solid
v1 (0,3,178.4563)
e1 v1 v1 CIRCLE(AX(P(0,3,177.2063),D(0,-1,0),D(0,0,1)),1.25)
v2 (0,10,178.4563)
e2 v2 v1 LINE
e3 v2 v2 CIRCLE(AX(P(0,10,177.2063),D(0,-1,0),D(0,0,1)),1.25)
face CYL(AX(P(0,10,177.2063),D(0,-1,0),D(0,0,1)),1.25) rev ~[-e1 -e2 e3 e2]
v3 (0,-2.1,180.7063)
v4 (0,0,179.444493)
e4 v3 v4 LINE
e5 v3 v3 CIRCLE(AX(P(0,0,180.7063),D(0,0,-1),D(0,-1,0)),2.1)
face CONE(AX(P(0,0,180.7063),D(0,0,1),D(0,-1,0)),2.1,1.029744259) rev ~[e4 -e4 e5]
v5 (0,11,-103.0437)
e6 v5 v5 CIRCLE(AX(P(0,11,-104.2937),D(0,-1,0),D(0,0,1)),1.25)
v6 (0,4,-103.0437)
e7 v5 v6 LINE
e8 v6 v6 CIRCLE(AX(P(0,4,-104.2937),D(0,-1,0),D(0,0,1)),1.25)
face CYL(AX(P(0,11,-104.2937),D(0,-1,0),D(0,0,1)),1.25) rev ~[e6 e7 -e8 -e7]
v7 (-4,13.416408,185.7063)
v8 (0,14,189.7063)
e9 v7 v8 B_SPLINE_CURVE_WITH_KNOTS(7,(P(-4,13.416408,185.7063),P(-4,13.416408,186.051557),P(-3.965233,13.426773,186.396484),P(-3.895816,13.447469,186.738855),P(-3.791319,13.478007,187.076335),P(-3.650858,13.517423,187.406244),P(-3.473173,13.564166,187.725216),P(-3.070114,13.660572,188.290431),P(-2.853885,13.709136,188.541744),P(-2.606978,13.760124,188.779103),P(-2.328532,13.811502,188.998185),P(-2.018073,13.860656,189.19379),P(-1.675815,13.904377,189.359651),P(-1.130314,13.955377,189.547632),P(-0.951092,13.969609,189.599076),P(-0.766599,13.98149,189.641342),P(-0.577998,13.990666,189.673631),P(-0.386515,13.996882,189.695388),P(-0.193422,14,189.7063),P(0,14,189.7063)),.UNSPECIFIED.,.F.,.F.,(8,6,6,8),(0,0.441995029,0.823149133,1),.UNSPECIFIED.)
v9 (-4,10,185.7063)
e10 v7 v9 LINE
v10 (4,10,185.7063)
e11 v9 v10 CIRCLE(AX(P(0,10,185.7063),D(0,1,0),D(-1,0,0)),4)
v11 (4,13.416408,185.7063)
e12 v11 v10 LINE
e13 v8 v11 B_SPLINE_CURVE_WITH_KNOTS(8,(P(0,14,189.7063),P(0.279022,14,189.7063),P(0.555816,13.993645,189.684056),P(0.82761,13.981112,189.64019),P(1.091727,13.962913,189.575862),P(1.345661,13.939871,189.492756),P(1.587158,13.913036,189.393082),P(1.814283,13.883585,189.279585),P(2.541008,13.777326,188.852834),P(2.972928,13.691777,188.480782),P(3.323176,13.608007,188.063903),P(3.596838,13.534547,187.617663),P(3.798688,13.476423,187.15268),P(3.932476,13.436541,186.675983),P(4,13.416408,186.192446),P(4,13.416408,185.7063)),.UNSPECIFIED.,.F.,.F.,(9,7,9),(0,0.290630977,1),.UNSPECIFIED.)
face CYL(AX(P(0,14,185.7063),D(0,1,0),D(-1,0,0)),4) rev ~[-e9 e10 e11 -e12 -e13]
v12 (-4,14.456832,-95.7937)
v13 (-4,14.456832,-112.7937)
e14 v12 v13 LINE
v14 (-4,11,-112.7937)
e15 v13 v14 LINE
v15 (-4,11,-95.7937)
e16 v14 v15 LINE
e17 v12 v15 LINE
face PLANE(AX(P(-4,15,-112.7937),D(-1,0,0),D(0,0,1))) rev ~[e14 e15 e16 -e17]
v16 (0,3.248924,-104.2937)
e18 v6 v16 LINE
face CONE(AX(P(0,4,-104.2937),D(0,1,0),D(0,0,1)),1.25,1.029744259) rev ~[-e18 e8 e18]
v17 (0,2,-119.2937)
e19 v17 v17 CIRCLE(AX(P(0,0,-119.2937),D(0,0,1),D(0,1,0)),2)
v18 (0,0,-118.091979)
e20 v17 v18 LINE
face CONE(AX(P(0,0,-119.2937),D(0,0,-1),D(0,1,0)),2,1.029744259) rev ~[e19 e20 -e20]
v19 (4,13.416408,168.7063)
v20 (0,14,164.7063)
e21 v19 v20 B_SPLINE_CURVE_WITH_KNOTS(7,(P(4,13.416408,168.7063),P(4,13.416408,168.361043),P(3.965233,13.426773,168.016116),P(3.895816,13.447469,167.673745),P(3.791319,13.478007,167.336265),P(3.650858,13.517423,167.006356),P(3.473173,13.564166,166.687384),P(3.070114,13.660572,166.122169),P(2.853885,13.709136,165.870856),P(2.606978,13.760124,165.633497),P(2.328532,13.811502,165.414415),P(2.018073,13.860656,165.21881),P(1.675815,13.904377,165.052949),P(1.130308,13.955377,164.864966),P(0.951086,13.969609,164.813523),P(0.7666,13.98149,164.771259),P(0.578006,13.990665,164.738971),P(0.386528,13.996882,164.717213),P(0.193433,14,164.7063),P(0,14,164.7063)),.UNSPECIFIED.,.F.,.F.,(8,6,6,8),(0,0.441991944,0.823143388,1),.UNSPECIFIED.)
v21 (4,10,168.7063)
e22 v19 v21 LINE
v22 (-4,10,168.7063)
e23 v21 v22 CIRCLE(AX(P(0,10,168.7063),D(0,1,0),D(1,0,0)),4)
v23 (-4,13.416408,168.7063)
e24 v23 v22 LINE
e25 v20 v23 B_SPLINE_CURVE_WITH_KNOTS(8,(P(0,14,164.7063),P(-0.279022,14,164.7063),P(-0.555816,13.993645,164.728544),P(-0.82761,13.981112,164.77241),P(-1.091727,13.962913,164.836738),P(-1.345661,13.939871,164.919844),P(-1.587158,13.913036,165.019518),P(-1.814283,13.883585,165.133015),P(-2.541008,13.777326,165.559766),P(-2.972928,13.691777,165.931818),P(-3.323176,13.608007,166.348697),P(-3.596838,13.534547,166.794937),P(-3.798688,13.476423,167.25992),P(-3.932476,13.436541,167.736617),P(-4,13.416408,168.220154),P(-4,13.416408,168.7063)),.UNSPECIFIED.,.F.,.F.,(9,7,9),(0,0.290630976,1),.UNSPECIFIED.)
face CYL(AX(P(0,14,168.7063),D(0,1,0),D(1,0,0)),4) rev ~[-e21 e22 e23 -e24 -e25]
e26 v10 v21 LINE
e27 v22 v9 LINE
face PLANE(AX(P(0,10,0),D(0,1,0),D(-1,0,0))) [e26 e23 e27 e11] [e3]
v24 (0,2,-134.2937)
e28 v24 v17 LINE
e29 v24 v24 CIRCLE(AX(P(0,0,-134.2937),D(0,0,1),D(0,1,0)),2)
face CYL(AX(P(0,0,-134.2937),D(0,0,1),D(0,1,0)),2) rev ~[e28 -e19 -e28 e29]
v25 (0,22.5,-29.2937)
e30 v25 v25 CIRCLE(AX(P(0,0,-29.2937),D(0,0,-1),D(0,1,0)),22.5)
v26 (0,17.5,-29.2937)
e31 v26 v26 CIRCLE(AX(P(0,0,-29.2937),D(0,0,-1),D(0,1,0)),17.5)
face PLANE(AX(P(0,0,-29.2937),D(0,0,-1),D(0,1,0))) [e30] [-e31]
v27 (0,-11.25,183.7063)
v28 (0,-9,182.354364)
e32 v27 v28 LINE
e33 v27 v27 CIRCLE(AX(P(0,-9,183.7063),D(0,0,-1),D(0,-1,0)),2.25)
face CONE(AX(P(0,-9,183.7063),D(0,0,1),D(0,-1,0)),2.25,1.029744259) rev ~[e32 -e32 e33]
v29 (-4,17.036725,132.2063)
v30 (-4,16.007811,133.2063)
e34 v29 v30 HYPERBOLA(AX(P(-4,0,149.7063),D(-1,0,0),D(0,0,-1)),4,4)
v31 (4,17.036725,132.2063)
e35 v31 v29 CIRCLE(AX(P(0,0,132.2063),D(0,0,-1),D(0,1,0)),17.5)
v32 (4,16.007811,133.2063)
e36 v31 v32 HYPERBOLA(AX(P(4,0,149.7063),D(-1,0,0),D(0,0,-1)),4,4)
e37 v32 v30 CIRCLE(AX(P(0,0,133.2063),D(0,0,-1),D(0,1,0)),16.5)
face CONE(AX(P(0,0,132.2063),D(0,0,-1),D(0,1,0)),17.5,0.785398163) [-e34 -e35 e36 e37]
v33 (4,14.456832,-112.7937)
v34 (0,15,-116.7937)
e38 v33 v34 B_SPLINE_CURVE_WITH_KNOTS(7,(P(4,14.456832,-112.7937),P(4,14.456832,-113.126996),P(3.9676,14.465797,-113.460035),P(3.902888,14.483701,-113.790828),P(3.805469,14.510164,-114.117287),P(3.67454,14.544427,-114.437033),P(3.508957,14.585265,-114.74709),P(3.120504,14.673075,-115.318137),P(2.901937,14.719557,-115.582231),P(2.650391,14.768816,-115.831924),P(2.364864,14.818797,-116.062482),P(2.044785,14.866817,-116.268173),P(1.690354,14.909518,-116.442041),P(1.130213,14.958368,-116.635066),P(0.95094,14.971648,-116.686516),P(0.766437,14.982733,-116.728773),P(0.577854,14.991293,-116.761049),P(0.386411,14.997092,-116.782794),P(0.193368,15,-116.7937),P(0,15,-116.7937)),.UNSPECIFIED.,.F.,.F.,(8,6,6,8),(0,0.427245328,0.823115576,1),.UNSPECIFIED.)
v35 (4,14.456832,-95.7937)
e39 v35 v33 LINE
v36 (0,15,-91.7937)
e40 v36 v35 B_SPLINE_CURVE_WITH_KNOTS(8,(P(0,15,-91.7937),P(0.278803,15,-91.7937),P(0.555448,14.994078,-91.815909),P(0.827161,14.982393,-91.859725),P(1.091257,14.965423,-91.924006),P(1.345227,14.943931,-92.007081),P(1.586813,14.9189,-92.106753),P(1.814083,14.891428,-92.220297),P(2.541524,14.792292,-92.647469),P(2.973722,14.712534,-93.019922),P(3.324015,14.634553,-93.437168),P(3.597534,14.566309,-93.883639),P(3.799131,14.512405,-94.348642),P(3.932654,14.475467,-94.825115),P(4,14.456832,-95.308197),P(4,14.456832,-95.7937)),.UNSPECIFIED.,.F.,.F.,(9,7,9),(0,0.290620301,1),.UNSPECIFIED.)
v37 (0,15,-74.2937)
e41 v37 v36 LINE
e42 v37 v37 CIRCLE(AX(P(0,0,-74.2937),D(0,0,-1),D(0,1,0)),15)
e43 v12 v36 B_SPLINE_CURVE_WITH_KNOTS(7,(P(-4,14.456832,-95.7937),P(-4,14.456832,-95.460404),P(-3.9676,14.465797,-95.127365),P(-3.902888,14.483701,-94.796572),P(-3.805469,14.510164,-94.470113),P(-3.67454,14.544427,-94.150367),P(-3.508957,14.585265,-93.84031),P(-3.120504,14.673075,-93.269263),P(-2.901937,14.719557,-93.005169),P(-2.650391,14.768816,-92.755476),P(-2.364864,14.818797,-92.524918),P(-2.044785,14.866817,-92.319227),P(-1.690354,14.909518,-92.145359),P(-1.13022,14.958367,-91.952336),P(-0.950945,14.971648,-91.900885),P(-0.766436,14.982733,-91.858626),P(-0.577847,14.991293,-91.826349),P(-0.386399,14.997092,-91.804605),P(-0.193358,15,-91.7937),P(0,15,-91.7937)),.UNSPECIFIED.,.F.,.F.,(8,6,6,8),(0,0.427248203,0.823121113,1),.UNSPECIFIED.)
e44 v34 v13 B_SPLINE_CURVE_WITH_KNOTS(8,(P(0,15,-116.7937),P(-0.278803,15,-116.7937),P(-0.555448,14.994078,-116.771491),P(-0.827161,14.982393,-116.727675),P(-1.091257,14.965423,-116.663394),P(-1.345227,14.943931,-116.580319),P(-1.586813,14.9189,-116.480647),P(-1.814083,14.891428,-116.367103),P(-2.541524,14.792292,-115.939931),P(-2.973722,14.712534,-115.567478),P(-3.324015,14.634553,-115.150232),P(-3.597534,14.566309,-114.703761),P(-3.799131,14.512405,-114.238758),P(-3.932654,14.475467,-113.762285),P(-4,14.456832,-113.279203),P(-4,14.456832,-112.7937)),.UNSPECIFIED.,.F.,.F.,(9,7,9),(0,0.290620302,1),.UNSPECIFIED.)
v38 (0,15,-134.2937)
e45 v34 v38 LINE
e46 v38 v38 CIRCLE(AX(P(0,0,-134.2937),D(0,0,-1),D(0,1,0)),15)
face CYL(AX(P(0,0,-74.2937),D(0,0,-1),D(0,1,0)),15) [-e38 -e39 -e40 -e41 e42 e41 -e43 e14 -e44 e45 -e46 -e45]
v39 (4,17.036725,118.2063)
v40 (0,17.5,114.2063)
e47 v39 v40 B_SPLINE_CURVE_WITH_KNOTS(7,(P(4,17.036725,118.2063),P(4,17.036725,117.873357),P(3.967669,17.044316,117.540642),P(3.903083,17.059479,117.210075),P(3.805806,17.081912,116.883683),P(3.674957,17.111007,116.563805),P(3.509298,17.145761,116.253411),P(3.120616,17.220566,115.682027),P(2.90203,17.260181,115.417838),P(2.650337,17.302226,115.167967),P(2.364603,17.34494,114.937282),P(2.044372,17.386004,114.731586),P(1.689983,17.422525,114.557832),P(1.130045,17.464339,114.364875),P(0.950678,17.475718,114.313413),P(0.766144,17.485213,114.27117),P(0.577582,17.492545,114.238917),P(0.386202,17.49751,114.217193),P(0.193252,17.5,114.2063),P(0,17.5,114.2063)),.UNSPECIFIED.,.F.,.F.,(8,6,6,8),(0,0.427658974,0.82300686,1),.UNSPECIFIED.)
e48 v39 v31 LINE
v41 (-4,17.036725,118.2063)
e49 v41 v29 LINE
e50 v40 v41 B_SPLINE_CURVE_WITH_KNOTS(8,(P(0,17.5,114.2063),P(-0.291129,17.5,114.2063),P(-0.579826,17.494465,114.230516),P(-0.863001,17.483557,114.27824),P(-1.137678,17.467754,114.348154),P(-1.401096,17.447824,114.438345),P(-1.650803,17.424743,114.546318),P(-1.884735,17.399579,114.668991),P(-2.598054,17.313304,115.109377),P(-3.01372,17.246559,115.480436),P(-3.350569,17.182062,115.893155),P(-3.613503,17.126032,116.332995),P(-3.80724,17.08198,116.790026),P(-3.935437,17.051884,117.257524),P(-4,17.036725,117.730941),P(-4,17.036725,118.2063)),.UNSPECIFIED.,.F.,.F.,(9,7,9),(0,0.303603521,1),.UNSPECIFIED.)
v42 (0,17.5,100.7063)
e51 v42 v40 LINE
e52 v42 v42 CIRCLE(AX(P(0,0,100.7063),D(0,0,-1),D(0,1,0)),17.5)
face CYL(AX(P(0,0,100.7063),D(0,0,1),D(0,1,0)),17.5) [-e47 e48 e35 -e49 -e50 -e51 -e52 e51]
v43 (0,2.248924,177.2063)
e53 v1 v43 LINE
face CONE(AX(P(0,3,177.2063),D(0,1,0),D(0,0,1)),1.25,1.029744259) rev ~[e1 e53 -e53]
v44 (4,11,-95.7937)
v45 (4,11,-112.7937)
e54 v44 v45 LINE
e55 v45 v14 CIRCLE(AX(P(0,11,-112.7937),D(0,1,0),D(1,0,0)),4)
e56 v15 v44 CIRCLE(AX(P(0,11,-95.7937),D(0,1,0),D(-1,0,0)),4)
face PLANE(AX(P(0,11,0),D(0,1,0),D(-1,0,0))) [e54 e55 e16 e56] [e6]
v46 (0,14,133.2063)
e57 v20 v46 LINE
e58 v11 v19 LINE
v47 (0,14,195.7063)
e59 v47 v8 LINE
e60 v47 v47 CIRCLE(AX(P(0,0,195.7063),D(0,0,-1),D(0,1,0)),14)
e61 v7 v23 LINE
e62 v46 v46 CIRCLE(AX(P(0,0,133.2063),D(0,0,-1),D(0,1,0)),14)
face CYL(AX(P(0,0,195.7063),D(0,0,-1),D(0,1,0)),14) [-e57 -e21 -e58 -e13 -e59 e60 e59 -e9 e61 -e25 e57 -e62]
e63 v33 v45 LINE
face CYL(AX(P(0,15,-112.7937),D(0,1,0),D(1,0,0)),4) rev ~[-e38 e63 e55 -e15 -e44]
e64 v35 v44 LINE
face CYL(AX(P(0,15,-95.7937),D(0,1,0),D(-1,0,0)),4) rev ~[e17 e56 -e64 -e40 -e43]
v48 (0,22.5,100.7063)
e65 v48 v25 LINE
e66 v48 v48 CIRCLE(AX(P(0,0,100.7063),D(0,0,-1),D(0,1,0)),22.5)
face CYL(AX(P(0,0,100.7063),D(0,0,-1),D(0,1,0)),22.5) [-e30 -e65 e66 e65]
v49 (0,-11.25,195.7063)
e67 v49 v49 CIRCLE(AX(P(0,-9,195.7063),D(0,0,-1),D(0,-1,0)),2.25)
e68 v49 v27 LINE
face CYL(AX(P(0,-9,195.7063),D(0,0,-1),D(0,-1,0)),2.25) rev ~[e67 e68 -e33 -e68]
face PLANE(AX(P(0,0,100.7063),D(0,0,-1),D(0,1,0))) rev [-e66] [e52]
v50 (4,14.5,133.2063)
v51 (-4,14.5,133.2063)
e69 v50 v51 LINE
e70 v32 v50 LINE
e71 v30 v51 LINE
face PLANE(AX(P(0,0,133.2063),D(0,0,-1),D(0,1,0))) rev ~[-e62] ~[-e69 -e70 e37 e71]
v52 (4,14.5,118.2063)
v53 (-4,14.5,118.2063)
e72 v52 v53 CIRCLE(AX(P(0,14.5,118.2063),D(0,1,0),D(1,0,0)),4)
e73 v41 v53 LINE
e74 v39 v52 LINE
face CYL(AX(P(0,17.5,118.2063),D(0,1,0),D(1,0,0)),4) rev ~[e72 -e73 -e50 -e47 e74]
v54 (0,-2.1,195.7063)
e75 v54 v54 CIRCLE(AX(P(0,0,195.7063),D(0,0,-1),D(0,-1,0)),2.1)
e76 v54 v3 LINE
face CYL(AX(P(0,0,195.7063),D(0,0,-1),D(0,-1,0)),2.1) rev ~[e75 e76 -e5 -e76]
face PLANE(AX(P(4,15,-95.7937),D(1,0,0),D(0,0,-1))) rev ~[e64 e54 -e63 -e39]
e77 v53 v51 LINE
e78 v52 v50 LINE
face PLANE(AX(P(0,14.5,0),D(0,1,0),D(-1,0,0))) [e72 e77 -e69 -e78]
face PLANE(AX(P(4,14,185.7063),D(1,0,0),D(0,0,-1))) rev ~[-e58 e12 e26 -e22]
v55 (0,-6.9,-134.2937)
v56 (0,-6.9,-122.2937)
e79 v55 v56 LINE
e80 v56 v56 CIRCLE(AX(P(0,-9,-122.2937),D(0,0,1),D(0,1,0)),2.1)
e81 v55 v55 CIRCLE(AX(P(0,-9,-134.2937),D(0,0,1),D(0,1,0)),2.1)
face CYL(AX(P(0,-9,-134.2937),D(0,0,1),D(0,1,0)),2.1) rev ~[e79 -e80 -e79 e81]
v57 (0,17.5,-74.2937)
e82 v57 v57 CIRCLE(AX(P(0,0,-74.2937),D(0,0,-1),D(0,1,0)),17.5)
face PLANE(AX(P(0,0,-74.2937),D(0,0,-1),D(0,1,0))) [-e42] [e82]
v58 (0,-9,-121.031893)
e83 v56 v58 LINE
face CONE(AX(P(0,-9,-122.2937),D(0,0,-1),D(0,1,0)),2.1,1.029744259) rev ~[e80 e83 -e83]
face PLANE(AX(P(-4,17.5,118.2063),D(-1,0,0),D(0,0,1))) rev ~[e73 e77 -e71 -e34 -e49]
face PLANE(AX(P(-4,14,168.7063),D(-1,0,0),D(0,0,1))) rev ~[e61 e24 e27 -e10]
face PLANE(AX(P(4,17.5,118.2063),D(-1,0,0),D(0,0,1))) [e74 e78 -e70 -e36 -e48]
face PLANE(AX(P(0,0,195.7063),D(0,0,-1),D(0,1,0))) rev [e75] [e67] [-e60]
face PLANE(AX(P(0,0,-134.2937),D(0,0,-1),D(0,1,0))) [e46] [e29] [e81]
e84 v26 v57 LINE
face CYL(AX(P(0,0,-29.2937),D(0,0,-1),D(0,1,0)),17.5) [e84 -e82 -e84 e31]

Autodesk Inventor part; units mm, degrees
ref_plane "YZ Plane" through (0, 0, 0) normal (1, 0, 0) x (0, 1, 0)
sketch "Sketch1" plane through (0, 0, 0) normal (1, 0, 0) x (0, 1, 0)
  line L0 (0, 195.7063) -> (0, -134.2937)
  line L1 (0, 195.7063) -> (14, 195.7063)
  line L2 (15, -134.2937) -> (0, -134.2937)
  line L3 (17.5, 100.7063) -> (22.5, 100.7063)
  line L4 (22.5, 100.7063) -> (22.5, -29.2937)
  line L5 (22.5, -29.2937) -> (17.5, -29.2937)
  line L6 (17.5, 100.7063) -> (17.5, 133.2063)
  line L7 (17.5, 133.2063) -> (14, 133.2063)
  line L8 (17.5, -29.2937) -> (17.5, -74.2937)
  line L9 (17.5, -74.2937) -> (15, -74.2937)
  line L10 (14, 195.7063) -> (14, 133.2063)
  line L11 (15, -74.2937) -> (15, -134.2937)
  point P0 (0, 0)
  point P1 (15.75, 133.2063)
  point P2 (20, -29.2937)
  point P3 (7.5, -134.2937)
  point P4 (16.25, -74.2937)
  dimension "d0" = 330
  dimension "d1" = 28
  dimension "d2" = 35
  dimension "d3" = 45
  dimension "d4" = 35
  dimension "d5" = 30
  dimension "d6" = 95
  dimension "d7" = 62.5
  dimension "d8" = 105
  dimension "d9" = 60
revolve "Revolution1" add sketch "Sketch1" angle 360 about axis through (0, 0, 195.7063) along (0, 0, -1)
thread "Thread3" size "M35x1.5" class "6g" standard "ISO Metric profile" length 18
chamfer "Chamfer2" distance 1 angle 45 1 edges at (0, -17.5, 133.2063)
thread "Thread4" size "R 1" standard "ISO Taper" length 23.2
ref_plane "Work Plane1" through (0, 14, 0) normal (0, 1, 0) x (-1, 0, 0)
ref_plane "Work Plane2" through (0, 17.5, 0) normal (0, 1, 0) x (-1, 0, 0)
sketch "Sketch2" plane through (0, 14, 0) normal (0, 1, 0) x (-1, 0, 0)
  line L0 (-14, 195.7063) -> (14, 195.7063) projected
  line L1 (14, 195.7063) -> (14, 133.2063) projected
  line L2 (-14, 195.7063) -> (-14, 133.2063) projected
  line L3 (0, 185.7063) -> (0, 168.7063) construction
  line L4 (-4, 185.7063) -> (-4, 168.7063)
  line L5 (4, 168.7063) -> (4, 185.7063)
  arc A0 (4, 185.7063) -> (-4, 185.7063) centre (0, 185.7063) ccw
  arc A1 (-4, 168.7063) -> (4, 168.7063) centre (0, 168.7063) ccw
  point P0 (0, 0)
  point P1 (0, 177.2063)
  point P2 (0, 164.7063)
  point P3 (0, 189.7063)
  dimension "d29" = 25
  dimension "d30" = 6
  dimension "d31" = 8
extrude "Extrusion1" cut sketch "Sketch2" against normal blind 4
sketch "Sketch3" plane through (0, 17.5, 0) normal (0, 1, 0) x (-1, 0, 0)
  arc A0 (-4, 118.2063) -> (4, 118.2063) centre (0, 118.2063) ccw
  line L0 (4, 118.2063) -> (4, 133.2938)
  line L1 (-4, 118.2063) -> (-4, 133.2063)
  line L2 (-14, 133.2063) -> (14, 133.2063) projected
  point P0 (0, 0)
  point P1 (0, 114.2063)
  point P2 (0, 133.2063)
  point P3 (4, 133.2063)
  dimension "d34" = 8
  dimension "d35" = 19
extrude "Extrusion2" cut sketch "Sketch3" against normal blind 3
ref_plane "Work Plane3" through (0, 15, 0) normal (0, 1, 0) x (-1, 0, 0)
sketch "Sketch4" plane through (0, 15, 0) normal (0, 1, 0) x (-1, 0, 0)
  line L0 (0, -95.7937) -> (0, -112.7937) construction
  line L1 (-4, -95.7937) -> (-4, -112.7937)
  line L2 (4, -112.7937) -> (4, -95.7937)
  arc A0 (4, -95.7937) -> (-4, -95.7937) centre (0, -95.7937) ccw
  arc A1 (-4, -112.7937) -> (4, -112.7937) centre (0, -112.7937) ccw
  line L3 (-15, -134.2937) -> (15, -134.2937) projected
  point P0 (0, 0)
  point P1 (0, -104.2937)
  point P2 (0, -116.7937)
  point P3 (0, -91.7937)
  dimension "d39" = 8
  dimension "d40" = 25
  dimension "d41" = 17.5
extrude "Extrusion3" cut sketch "Sketch4" against normal blind 4
sketch "Sketch11" plane through (0, 11, 0) normal (0, 1, 0) x (1, 0, 0)
  arc A0 (4, 112.7937) -> (-4, 112.7937) centre (0, 112.7937) ccw projected
  line L0 (4, 112.7937) -> (4, 104.2937)
  line L1 (4, 112.7937) -> (4, 95.7937) projected
  line L2 (4, 104.2937) -> (0, 104.2937)
  point P0 (0, 0)
  dimension "d100" = 8.5
  dimension "d101" = 4
sketch "Sketch12" plane through (0, 10, 0) normal (0, 1, 0) x (1, 0, 0)
  arc A0 (-4, -185.7063) -> (4, -185.7063) centre (0, -185.7063) ccw projected
  line L0 (4, -185.7063) -> (4, -177.2063)
  line L1 (4, -177.2063) -> (0, -177.2063)
  point P0 (0, 0)
  dimension "d102" = 8.5
  dimension "d103" = 4
sketch "Sketch5" plane through (0, 0, 195.7063) normal (0, 0, 1) x (1, 0, 0)
  circle A0 centre (0, 0) radius 3
  circle A1 centre (0, -9) radius 2.25
  dimension "d44" = 6
  dimension "d45" = 4.5
  dimension "d46" = 9
hole "Hole1" at (0, -9, 195.7063) direction (0, 0, -1) diameter 4.5 depth 12 tip angle 118
sketch "Sketch6" plane through (0, 0, 195.7063) normal (0, 0, 1) x (1, 0, 0)
  circle A0 centre (0, 0) radius 14 projected
hole "Hole2" at (0, 0, 195.7063) direction (0, 0, -1) diameter 4.2 depth 15 tip angle 118
thread "Thread5" size "M5x0.8" class "6H" standard "ISO Metric profile" length 10
sketch "Sketch7" plane through (0, 0, -134.2937) normal (0, 0, -1) x (-1, 0, 0)
  circle A0 centre (0, 0) radius 2.5
  circle A1 centre (0, -9) radius 2.25 projected
  circle A2 centre (0, -9) radius 2.25
  dimension "d63" = 5
hole "Hole3" at (0, -9, -134.2937) direction (0, 0, 1) diameter 4.2 depth 12 tip angle 118
sketch "Sketch8" plane through (0, 0, -134.2937) normal (0, 0, -1) x (-1, 0, 0)
  circle A0 centre (0, 0) radius 15 projected
hole "Hole4" at (0, 0, -134.2937) direction (0, 0, 1) diameter 4 depth 15 tip angle 118
sketch "Sketch9" plane through (0, 10, 0) normal (0, 1, 0) x (1, 0, 0)
  line L0 (4, -168.7063) -> (4, -185.7063) projected
  point P0 (0, 0)
  point P1 (0, -177.2063)
  dimension "d97" = 4
hole "Hole5" at (0, 10, 177.2063) direction (0, -1, 0) diameter 2.5 depth 7 tip angle 118
thread "Thread7" size "M3x0.5" class "6H" standard "ISO Metric profile" length 6
sketch "Sketch10" plane through (0, 11, 0) normal (0, 1, 0) x (1, 0, 0)
  line L0 (4, 112.7937) -> (4, 95.7937) projected
  point P0 (0, 0)
  point P1 (0, 104.2937)
  dimension "d89" = 4
hole "Hole6" at (0, 11, -104.2937) direction (0, -1, 0) diameter 2.5 depth 7 tip angle 118
thread "Thread8" size "M3x0.5" class "6H" standard "ISO Metric profile" length 6 offset 1
thread "Thread10" size "M4x0.7" class "6H" standard "ISO Metric profile" length 10
properties part number "Wał"
